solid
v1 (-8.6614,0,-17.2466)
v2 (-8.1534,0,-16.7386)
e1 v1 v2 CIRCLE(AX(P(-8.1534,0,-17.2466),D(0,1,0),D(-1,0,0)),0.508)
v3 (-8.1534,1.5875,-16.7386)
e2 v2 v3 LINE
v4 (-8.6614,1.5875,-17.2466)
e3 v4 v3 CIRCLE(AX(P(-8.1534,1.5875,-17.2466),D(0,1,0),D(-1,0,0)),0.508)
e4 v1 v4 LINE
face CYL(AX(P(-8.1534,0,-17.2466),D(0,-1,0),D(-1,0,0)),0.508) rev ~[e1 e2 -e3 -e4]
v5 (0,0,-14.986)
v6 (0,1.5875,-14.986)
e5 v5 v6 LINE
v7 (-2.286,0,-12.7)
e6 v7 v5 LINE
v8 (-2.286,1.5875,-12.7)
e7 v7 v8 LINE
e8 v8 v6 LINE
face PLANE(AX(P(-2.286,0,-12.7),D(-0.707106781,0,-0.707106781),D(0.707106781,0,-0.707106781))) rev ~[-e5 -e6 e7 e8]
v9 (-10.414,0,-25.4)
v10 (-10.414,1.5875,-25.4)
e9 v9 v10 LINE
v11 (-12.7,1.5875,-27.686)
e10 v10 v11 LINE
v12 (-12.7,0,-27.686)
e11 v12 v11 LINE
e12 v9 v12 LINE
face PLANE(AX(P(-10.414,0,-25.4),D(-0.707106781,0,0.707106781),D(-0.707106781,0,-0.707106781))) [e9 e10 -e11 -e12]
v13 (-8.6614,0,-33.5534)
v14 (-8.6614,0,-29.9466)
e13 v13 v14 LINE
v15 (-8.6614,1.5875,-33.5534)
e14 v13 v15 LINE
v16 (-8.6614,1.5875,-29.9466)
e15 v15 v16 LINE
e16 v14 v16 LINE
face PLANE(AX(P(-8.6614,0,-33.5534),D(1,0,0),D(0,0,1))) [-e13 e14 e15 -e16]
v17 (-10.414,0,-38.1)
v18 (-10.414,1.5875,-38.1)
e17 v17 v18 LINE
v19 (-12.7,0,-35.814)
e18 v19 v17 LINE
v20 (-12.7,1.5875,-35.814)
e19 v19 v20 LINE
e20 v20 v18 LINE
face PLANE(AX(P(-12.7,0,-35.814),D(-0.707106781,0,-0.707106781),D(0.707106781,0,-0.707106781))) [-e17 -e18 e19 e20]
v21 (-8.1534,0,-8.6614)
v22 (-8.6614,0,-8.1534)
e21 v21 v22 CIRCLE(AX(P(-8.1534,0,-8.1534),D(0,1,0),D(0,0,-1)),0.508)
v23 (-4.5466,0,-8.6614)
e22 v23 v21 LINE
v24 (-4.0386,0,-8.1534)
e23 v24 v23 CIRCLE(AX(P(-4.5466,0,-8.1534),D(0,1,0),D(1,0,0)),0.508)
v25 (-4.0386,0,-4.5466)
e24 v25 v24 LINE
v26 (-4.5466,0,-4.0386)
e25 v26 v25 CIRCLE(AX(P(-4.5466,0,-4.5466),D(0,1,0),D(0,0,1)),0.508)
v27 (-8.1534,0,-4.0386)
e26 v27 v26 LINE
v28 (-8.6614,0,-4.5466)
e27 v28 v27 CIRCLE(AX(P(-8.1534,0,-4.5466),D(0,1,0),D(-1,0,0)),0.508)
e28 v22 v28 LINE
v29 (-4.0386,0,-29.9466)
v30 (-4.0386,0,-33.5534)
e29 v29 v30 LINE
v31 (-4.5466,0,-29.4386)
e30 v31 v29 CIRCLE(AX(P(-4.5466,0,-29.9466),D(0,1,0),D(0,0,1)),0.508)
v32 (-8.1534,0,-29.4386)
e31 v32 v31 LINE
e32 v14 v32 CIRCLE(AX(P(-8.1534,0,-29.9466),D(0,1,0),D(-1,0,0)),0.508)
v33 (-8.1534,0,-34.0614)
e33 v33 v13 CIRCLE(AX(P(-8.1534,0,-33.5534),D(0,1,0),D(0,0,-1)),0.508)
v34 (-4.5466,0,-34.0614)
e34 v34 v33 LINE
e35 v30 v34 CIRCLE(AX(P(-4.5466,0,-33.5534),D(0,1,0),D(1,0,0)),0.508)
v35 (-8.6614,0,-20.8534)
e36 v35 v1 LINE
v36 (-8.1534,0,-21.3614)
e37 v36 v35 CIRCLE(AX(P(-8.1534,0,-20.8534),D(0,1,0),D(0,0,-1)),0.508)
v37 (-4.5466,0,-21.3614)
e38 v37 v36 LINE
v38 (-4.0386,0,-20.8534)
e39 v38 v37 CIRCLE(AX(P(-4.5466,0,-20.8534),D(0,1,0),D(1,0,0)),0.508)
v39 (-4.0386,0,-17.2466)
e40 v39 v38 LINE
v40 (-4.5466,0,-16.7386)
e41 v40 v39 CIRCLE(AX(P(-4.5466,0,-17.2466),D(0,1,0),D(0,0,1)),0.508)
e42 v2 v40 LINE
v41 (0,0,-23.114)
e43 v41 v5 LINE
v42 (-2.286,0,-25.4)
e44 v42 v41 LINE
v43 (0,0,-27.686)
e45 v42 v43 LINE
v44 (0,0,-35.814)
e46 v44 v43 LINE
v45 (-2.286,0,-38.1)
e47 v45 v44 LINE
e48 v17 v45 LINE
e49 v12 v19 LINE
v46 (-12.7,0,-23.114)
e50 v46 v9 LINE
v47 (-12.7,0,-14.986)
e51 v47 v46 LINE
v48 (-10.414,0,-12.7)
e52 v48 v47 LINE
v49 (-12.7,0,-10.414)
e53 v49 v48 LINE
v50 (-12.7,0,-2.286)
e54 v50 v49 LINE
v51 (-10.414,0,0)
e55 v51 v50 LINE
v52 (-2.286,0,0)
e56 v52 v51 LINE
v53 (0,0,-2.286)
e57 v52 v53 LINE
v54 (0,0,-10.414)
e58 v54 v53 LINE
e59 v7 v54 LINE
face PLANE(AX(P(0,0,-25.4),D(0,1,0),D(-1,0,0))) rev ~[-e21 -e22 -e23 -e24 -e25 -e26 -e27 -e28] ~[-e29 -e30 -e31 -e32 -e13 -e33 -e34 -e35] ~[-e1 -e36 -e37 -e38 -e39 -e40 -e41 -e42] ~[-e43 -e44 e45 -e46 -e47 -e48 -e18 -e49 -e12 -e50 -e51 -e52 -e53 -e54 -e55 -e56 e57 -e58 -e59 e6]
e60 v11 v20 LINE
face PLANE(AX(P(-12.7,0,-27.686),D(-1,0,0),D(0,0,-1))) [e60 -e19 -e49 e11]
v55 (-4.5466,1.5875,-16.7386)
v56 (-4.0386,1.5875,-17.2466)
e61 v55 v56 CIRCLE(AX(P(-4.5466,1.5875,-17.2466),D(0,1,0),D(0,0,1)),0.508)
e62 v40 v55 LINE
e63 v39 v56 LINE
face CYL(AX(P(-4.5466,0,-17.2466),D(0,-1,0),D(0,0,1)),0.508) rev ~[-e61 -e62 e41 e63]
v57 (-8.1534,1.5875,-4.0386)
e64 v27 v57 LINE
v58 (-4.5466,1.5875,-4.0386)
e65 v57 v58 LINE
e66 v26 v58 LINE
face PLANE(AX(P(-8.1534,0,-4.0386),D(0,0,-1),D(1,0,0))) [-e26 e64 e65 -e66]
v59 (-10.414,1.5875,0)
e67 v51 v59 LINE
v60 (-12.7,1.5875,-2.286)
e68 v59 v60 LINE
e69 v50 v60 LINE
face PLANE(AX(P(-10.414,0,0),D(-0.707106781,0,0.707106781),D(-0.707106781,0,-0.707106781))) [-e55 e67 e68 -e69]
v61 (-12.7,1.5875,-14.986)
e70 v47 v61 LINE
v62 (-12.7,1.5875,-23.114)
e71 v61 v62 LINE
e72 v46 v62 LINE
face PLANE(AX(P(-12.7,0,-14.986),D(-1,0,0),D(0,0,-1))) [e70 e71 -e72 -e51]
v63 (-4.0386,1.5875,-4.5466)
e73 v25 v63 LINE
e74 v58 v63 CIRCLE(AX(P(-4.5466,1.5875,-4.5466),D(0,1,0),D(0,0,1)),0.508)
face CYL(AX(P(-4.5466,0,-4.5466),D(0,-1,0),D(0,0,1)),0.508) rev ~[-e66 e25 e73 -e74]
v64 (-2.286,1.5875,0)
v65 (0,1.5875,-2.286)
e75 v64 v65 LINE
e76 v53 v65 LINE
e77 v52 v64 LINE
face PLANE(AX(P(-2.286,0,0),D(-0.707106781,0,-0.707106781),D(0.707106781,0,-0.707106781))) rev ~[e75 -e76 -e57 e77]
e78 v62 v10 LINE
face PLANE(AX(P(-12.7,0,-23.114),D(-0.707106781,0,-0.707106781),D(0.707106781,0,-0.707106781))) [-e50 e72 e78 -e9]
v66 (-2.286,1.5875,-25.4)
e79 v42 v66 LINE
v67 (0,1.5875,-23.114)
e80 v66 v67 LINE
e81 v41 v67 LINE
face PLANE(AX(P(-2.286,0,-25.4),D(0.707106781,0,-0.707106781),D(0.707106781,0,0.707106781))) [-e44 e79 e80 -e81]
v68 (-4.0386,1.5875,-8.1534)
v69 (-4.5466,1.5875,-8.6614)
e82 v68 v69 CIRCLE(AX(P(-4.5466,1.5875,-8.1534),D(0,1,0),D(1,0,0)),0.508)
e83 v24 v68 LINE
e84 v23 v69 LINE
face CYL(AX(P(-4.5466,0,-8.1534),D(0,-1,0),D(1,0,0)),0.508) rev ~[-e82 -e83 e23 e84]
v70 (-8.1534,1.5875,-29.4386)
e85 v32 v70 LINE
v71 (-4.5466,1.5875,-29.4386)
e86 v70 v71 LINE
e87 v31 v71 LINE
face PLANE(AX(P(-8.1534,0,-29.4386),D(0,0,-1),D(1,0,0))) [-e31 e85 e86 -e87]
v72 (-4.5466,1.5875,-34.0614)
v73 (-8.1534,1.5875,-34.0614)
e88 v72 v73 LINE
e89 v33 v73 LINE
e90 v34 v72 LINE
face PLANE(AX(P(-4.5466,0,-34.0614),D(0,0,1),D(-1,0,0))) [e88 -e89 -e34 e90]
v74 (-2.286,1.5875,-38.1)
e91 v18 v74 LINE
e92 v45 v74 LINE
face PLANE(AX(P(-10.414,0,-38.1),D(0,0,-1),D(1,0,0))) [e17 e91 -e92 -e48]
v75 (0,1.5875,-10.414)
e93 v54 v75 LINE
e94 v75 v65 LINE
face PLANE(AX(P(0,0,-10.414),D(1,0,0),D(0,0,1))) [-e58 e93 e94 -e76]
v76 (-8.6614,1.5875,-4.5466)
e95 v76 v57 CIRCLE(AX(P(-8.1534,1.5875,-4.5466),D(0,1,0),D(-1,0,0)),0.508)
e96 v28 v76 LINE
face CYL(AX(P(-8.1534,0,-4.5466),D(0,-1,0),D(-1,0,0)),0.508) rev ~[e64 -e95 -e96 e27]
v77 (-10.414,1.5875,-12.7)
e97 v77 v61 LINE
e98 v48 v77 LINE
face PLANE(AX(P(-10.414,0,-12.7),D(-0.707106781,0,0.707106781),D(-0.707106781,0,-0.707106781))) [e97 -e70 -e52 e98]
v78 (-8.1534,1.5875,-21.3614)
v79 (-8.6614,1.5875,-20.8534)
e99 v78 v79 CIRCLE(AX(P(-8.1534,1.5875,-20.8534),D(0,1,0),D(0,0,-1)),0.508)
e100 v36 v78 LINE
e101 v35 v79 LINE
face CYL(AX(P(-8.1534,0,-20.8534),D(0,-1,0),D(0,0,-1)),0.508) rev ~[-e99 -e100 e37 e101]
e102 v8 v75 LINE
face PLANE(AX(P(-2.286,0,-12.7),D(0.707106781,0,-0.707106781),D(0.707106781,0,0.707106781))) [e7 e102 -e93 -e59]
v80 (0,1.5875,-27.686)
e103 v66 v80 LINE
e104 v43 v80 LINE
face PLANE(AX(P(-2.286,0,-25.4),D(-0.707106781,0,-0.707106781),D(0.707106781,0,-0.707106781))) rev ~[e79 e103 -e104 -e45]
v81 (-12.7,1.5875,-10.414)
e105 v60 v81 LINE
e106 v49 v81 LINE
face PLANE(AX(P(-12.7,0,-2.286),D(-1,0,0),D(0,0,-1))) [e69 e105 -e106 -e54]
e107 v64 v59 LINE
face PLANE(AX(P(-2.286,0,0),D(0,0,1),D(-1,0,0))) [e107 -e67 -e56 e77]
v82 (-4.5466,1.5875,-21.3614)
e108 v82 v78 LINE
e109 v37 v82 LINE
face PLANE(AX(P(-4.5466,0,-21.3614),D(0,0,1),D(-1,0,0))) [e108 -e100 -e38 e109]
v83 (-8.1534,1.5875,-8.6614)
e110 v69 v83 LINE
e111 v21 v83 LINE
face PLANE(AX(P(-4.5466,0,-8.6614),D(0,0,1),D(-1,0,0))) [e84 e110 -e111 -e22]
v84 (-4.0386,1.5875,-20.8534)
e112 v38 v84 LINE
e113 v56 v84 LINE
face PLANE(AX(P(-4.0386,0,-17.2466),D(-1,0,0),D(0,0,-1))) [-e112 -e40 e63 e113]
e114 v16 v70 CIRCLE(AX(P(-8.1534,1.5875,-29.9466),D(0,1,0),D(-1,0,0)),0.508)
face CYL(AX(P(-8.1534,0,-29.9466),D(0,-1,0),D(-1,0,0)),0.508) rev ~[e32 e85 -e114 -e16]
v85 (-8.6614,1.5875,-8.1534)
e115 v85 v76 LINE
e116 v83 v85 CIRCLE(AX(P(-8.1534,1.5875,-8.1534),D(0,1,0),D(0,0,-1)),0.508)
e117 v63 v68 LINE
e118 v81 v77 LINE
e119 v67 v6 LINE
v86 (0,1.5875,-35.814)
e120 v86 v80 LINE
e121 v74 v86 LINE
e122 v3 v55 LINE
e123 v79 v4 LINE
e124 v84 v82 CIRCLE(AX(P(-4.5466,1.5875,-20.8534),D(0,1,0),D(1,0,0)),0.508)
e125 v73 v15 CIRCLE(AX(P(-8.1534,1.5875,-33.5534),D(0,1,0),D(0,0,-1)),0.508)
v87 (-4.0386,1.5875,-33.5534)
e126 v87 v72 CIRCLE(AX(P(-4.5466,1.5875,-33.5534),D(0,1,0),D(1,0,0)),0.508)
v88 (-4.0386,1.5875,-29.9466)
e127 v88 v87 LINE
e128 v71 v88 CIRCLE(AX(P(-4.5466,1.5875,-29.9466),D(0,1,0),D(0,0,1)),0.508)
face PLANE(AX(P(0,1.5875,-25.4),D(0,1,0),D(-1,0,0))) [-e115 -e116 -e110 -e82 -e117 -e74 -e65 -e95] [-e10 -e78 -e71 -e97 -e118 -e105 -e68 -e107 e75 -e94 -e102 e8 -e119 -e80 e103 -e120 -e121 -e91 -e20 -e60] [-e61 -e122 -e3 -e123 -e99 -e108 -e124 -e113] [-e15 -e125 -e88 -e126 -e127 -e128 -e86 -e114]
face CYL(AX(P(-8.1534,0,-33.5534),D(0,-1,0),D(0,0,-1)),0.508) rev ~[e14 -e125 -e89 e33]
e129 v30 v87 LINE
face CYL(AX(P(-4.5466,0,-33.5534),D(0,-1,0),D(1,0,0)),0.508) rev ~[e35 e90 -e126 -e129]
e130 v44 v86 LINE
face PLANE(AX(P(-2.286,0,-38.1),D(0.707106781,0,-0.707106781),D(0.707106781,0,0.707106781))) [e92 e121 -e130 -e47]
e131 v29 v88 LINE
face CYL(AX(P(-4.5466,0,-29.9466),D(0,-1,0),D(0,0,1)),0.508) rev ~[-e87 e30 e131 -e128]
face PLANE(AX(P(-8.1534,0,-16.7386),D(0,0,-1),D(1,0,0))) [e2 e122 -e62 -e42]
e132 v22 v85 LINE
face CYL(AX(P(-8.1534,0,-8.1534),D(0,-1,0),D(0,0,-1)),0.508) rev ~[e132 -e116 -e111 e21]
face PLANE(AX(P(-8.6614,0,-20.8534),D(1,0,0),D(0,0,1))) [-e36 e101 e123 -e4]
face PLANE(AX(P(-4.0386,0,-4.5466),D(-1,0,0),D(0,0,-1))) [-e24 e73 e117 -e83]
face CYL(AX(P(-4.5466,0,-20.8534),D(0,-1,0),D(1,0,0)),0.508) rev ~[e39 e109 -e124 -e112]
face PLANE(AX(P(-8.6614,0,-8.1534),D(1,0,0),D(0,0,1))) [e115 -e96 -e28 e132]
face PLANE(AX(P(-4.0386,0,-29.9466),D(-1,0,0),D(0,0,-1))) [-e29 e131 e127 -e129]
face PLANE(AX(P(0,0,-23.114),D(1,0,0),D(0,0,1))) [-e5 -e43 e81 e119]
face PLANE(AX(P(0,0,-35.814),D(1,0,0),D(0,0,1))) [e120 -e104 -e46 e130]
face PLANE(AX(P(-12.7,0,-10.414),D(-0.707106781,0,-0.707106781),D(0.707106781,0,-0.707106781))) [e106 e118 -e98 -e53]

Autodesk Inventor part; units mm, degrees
ref_plane "YZ Plane" through (0, 0, 0) normal (1, 0, 0) x (0, 1, 0)
ref_plane "XZ Plane" through (0, 0, 0) normal (0, 1, 0) x (-1, 0, 0)
ref_plane "XY Plane" through (0, 0, 0) normal (0, 0, 1) x (1, 0, 0)
sketch "Sketch1" plane through (0, 0, 0) normal (0, 1, 0) x (-1, 0, 0)
  line L0 (2.286, 0) -> (10.414, 0)
  line L1 (12.7, -2.286) -> (12.7, -10.414)
  line L2 (10.414, -12.7) -> (2.286, -12.7)
  line L3 (0, -10.414) -> (0, -2.286)
  line L4 (8.1534, -4.0386) -> (4.5466, -4.0386)
  line L5 (4.0386, -4.5466) -> (4.0386, -8.1534)
  line L6 (4.5466, -8.6614) -> (8.1534, -8.6614)
  line L7 (8.6614, -8.1534) -> (8.6614, -4.5466)
  line L8 (10.414, 0) -> (12.7, -2.286)
  line L9 (12.7, -10.414) -> (10.414, -12.7)
  line L10 (2.286, -12.7) -> (0, -10.414)
  line L11 (2.286, 0) -> (0, -2.286)
  arc A0 (8.6614, -4.5466) -> (8.1534, -4.0386) centre (8.1534, -4.5466) ccw
  arc A1 (8.1534, -8.6614) -> (8.6614, -8.1534) centre (8.1534, -8.1534) ccw
  arc A2 (4.0386, -8.1534) -> (4.5466, -8.6614) centre (4.5466, -8.1534) ccw
  arc A3 (4.5466, -4.0386) -> (4.0386, -4.5466) centre (4.5466, -4.5466) ccw
  line L12 (8.1534, -4.5466) -> (4.5466, -8.1534) construction
  line L13 (12.7, -10.414) -> (0, -2.286) construction
  point P0 (0, 0)
  point P1 (12.7, -12.7)
  point P2 (12.7, 0)
  point P3 (0, -12.7)
  point P4 (4.0386, -8.6614)
  point P5 (8.6614, -8.6614)
  point P6 (6.35, -6.35)
  dimension "d1" = 12.7
  dimension "d2" = 4.6228
  dimension "d3" = 2.286
  dimension "d4" = 2.286
  dimension "d5" = 2.286
  dimension "d6" = 2.286
  dimension "d7" = 2.286
  dimension "d8" = 2.286
  dimension "d9" = 2.286
  dimension "d10" = 2.286
  dimension "d11" = 0.508
extrude "Body" add sketch "Sketch1" along normal blind 1.5875
sketch "Sketch2" plane through (0, 1.5875, 0) normal (0, 1, 0) x (1, 0, 0)
  arc A0 (-8.1534, 8.6614) -> (-8.6614, 8.1534) centre (-8.1534, 8.1534) ccw construction
  arc A1 (-4.5466, 4.0386) -> (-4.0386, 4.5466) centre (-4.5466, 4.5466) ccw construction
  circle A2 centre (-6.35, 6.35) radius 2.1844
  line L0 (-8.1534, 8.1534) -> (-4.5466, 4.5466) construction
  point P0 (0, 0)
  dimension "d14" = 4.3688
surface extrude "Circle" sketch "Sketch2" against normal up to surface (1.5875 mm away) shown yes curves A2
pattern_linear "Rectangular Pattern1" count 3 spacing 12.7 along (0, 0, -1) of "Body", "Circle"
equation "\"d4\" = d3"
equation "\"d5\" = d3"
equation "\"d6\" = d5"
equation "\"d7\" = d3"
equation "\"d8\" = d7"
equation "\"d9\" = d3"
equation "\"d10\" = d9"
equation "\"d22\" = d19"
equation "\"d19\" = 12.7"
